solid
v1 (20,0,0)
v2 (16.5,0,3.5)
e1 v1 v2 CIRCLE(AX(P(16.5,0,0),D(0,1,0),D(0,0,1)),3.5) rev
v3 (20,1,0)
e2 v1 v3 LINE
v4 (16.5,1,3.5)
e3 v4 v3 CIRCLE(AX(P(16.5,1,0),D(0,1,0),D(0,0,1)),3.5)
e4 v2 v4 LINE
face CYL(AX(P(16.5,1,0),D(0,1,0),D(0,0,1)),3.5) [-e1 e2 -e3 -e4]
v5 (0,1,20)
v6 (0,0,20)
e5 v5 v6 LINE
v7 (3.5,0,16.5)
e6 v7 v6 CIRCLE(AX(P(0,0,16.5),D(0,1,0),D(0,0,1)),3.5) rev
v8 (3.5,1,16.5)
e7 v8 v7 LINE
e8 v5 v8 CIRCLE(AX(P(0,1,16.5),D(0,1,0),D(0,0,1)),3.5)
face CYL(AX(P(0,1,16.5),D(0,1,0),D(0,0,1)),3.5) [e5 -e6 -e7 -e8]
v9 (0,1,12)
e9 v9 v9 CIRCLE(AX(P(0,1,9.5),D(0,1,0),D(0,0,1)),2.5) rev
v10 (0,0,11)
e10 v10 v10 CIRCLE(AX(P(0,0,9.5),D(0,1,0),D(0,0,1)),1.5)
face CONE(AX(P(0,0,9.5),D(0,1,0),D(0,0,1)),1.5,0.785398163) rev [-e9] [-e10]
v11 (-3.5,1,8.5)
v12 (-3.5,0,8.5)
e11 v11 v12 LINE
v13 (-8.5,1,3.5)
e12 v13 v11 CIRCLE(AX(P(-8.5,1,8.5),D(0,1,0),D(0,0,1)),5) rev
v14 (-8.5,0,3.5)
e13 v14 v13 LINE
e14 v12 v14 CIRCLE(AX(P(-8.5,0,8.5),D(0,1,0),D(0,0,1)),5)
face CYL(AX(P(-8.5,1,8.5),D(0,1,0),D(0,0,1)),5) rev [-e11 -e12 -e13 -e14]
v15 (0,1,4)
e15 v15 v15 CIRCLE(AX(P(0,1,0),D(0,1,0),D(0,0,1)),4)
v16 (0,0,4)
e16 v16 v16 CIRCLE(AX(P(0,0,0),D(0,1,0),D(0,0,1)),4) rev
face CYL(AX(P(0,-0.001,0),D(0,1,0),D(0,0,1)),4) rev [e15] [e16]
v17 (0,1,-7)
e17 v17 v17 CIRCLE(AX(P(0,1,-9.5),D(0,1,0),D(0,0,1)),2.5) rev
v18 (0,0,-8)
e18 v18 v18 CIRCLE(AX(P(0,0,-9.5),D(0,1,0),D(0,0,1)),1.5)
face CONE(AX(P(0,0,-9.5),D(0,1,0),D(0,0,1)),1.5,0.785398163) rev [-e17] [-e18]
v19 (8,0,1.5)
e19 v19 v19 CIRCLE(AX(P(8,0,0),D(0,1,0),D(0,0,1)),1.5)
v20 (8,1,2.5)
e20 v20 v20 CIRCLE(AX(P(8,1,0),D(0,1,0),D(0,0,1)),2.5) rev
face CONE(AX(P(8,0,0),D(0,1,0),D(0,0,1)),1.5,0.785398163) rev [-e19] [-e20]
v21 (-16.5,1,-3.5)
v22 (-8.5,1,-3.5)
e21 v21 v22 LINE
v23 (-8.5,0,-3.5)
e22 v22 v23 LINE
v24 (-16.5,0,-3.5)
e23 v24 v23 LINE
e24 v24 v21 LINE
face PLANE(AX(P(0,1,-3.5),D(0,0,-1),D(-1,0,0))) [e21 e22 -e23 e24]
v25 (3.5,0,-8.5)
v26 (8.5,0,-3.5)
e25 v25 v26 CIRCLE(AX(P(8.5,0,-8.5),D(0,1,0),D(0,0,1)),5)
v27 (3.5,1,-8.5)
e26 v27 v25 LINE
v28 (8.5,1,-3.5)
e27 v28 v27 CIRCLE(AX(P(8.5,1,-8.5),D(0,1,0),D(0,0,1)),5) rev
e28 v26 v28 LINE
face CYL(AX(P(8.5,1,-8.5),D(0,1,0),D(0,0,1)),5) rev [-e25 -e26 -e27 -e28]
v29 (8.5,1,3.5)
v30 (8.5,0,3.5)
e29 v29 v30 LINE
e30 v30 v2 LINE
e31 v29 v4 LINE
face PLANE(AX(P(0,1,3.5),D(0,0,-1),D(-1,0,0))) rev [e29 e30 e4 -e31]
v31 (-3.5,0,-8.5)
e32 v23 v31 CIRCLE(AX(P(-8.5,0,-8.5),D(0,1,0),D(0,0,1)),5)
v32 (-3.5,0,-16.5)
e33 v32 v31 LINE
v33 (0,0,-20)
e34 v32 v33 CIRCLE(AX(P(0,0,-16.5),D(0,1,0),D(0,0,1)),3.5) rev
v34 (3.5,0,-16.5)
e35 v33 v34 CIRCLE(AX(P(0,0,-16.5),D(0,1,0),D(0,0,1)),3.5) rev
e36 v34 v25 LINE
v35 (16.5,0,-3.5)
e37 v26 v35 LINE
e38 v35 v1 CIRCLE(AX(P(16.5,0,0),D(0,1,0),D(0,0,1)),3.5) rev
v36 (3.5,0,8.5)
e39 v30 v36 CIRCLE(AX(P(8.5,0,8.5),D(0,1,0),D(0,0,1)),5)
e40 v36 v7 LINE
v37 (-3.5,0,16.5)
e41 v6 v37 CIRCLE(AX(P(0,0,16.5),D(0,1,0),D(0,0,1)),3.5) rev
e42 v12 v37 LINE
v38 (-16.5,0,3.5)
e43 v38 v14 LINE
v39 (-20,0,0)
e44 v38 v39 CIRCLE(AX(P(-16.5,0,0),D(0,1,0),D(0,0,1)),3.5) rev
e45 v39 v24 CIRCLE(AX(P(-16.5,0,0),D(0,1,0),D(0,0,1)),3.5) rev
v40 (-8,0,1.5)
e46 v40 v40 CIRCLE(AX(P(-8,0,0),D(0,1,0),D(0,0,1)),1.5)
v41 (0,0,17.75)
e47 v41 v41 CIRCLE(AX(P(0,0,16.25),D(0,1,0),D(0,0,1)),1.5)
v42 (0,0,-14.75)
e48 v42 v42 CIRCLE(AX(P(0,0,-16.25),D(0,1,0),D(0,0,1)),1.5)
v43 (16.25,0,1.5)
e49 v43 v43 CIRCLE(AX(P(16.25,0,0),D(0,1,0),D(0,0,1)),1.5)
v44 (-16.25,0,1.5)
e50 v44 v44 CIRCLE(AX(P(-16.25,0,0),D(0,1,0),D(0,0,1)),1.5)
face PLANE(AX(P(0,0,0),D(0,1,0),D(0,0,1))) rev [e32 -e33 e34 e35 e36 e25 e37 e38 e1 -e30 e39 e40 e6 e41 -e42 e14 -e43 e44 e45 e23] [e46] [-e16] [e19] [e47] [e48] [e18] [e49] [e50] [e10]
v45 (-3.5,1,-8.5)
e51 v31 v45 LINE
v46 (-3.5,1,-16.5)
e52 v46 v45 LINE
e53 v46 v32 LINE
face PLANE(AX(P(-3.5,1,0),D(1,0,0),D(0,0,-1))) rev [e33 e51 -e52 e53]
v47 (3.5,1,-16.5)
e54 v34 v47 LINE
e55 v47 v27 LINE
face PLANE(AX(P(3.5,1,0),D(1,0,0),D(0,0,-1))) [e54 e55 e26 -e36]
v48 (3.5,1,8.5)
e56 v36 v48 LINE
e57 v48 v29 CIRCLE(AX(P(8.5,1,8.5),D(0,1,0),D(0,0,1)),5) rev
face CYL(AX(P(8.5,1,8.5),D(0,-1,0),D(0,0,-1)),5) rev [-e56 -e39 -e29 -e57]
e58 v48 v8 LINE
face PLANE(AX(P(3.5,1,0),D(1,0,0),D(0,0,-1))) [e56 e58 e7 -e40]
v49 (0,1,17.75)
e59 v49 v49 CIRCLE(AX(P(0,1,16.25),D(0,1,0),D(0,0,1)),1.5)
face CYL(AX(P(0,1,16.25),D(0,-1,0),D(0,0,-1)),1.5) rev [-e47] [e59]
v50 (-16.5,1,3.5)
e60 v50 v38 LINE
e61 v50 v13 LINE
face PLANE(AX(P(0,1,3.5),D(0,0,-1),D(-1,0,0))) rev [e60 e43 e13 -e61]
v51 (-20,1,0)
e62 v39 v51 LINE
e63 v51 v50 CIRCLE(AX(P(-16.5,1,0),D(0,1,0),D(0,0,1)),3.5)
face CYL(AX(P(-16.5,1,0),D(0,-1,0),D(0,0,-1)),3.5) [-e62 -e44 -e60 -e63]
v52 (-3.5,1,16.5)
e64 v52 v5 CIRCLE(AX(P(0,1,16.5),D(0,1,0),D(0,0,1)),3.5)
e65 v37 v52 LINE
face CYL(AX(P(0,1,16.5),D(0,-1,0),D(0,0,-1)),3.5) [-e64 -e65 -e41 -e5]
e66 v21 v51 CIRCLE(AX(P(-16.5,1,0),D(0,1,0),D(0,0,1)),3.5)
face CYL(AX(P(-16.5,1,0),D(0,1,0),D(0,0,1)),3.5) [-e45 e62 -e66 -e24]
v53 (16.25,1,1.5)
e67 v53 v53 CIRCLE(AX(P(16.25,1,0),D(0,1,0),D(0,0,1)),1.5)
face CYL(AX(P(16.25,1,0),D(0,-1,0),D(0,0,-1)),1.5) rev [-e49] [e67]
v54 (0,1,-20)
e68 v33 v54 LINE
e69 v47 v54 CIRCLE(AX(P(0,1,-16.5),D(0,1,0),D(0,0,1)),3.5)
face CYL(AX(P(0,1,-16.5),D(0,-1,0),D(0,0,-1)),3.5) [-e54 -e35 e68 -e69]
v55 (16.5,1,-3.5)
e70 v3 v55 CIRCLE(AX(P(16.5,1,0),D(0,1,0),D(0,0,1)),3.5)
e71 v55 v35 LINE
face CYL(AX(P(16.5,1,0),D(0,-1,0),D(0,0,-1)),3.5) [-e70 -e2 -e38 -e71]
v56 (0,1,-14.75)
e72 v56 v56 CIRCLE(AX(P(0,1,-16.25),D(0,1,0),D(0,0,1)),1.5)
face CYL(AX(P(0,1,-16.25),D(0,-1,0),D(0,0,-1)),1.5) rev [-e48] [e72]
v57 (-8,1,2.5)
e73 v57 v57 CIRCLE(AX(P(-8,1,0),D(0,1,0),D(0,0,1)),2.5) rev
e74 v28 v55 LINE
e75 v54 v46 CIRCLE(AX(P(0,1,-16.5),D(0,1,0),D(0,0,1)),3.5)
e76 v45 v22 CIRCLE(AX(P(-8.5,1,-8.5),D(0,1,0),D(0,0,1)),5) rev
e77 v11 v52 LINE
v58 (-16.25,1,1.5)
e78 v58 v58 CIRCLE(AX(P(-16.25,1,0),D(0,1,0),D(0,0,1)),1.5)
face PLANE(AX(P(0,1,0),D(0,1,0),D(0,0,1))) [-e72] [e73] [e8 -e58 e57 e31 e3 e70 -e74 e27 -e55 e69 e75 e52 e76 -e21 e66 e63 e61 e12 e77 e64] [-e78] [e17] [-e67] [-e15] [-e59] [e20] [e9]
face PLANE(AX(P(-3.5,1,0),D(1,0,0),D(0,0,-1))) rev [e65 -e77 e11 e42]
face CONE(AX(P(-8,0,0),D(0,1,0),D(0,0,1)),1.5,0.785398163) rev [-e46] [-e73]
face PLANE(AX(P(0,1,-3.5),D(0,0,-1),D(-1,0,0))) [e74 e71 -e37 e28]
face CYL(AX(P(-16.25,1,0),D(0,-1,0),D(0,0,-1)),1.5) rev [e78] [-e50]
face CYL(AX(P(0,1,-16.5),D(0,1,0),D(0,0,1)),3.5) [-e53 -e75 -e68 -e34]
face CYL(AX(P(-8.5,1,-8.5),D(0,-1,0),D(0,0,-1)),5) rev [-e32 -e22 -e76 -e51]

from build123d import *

# Parameters (mm, degrees)
SKETCH1_W           = 3.5
SKETCH1_H           = 3.5
BOSS_EXTRUDE1_DEPTH = 1
FILLET1_R           = 5
FILLET2_R           = 3.5
CUT_EXTRUDE1_REACH  = 30.302
SKETCH2_R           = 4
CHAMFER1_SIZE       = 1


with BuildPart() as part:
    # Sketch1 → Boss-Extrude1 (new body)
    with BuildSketch(Plane(origin=(0, 0, 0), x_dir=(1, 0, 0), z_dir=(0, 1, 0))):
        with BuildLine():
            Line((-6.5, 0), (-3.5, 0))
            Line((-3.5, 0), (-3.5, 3.5))
            Line((-3.5, 3.5), (-20, 3.5))
            Line((-20, 3.5), (-20, 0))
            Line((-20, 0), (-17.75, 0))
            ThreePointArc((-17.75, 0), (-16.25, 1.5), (-14.75, 0))
            Line((-14.75, 0), (-9.5, 0))
            ThreePointArc((-9.5, 0), (-8, 1.5), (-6.5, 0))
        make_face()
        with BuildLine():
            Line((-20, -3.5), (-3.5, -3.5))
            Line((-3.5, -3.5), (-3.5, 0))
            Line((-3.5, 0), (-6.5, 0))
            ThreePointArc((-6.5, 0), (-8, -1.5), (-9.5, 0))
            Line((-9.5, 0), (-14.75, 0))
            ThreePointArc((-14.75, 0), (-16.25, -1.5), (-17.75, 0))
            Line((-17.75, 0), (-20, 0))
            Line((-20, 0), (-20, -3.5))
        make_face()
        with BuildLine():
            Line((-3.5, 20), (-3.5, 3.5))
            Line((-3.5, 3.5), (0, 3.5))
            Line((0, 3.5), (0, 8))
            ThreePointArc((0, 8), (-1.5, 9.5), (0, 11))
            Line((0, 11), (0, 14.75))
            ThreePointArc((0, 14.75), (-1.5, 16.25), (0, 17.75))
            Line((0, 17.75), (0, 20))
            Line((0, 20), (-3.5, 20))
        make_face()
        with BuildLine():
            Line((0, 3.5), (3.5, 3.5))
            Line((3.5, 3.5), (3.5, 20))
            Line((3.5, 20), (0, 20))
            Line((0, 20), (0, 17.75))
            ThreePointArc((0, 17.75), (1.060660172, 17.310660172), (1.5, 16.25))
            ThreePointArc((1.5, 16.25), (1.060660172, 15.189339828), (0, 14.75))
            Line((0, 14.75), (0, 11))
            ThreePointArc((0, 11), (1.060660172, 10.560660172), (1.5, 9.5))
            ThreePointArc((1.5, 9.5), (1.060660172, 8.439339828), (0, 8))
            Line((0, 8), (0, 3.5))
        make_face()
        with BuildLine():
            Line((3.5, 3.5), (3.5, 0))
            Line((3.5, 0), (6.5, 0))
            ThreePointArc((6.5, 0), (8, 1.5), (9.5, 0))
            Line((9.5, 0), (14.75, 0))
            ThreePointArc((14.75, 0), (16.25, 1.5), (17.75, 0))
            Line((17.75, 0), (20, 0))
            Line((20, 0), (20, 3.5))
            Line((20, 3.5), (3.5, 3.5))
        make_face()
        with Locations((-1.75, 1.75)):
            Rectangle(SKETCH1_W, SKETCH1_H)
        with Locations((-1.75, -1.75)):
            Rectangle(SKETCH1_W, SKETCH1_H)
        with Locations((1.75, -1.75)):
            Rectangle(SKETCH1_W, SKETCH1_H)
        with Locations((1.75, 1.75)):
            Rectangle(SKETCH1_W, SKETCH1_H)
        with BuildLine():
            Line((-3.5, -20), (0, -20))
            Line((0, -20), (0, -17.75))
            ThreePointArc((0, -17.75), (-1.5, -16.25), (0, -14.75))
            Line((0, -14.75), (0, -11))
            ThreePointArc((0, -11), (-1.5, -9.5), (0, -8))
            Line((0, -8), (0, -3.5))
            Line((0, -3.5), (-3.5, -3.5))
            Line((-3.5, -3.5), (-3.5, -20))
        make_face()
        with BuildLine():
            Line((0, -17.75), (0, -20))
            Line((0, -20), (3.5, -20))
            Line((3.5, -20), (3.5, -3.5))
            Line((3.5, -3.5), (0, -3.5))
            Line((0, -3.5), (0, -8))
            ThreePointArc((0, -8), (1.060660172, -8.439339828), (1.5, -9.5))
            ThreePointArc((1.5, -9.5), (1.060660172, -10.560660172), (0, -11))
            Line((0, -11), (0, -14.75))
            ThreePointArc((0, -14.75), (1.060660172, -15.189339828), (1.5, -16.25))
            ThreePointArc((1.5, -16.25), (1.060660172, -17.310660172), (0, -17.75))
        make_face()
        with BuildLine():
            Line((3.5, 0), (3.5, -3.5))
            Line((3.5, -3.5), (20, -3.5))
            Line((20, -3.5), (20, 0))
            Line((20, 0), (17.75, 0))
            ThreePointArc((17.75, 0), (16.25, -1.5), (14.75, 0))
            Line((14.75, 0), (9.5, 0))
            ThreePointArc((9.5, 0), (8, -1.5), (6.5, 0))
            Line((6.5, 0), (3.5, 0))
        make_face()
    extrude(amount=BOSS_EXTRUDE1_DEPTH)

    # Fillet1
    fillet1_edges = [part.edges().sort_by_distance(p)[0] for p in [
        (-3.5, 0.5, -3.5),
        (3.5, 0.5, -3.5),
        (3.5, 0.5, 3.5),
        (-3.5, 0.5, 3.5),
    ]]
    fillet(fillet1_edges, radius=FILLET1_R)

    # Fillet2
    fillet2_edges = [part.edges().sort_by_distance(p)[0] for p in [
        (20, 0.5, 3.5),
        (20, 0.5, -3.5),
        (3.5, 0.5, -20),
        (-3.5, 0.5, -20),
        (-20, 0.5, -3.5),
        (-20, 0.5, 3.5),
        (3.5, 0.5, 20),
        (-3.5, 0.5, 20),
    ]]
    fillet(fillet2_edges, radius=FILLET2_R - 0.0001)  # a hair under: the kernel refuses the full size

    # Sketch2 → Cut-Extrude1 (cut, up to next)
    with BuildSketch(Plane(origin=(0, 1, 0), x_dir=(1, 0, 0), z_dir=(0, 1, 0)), mode=Mode.PRIVATE) as cut_extrude1_sk1:
        with Locations(Location((0, 0, 0), (0, 0, 270))):
            Circle(SKETCH2_R)
    cut_extrude1_tool1 = extrude(cut_extrude1_sk1.sketch, amount=-CUT_EXTRUDE1_REACH, mode=Mode.PRIVATE) & part.part
    add(cut_extrude1_tool1.solids().sort_by_distance((0, 1, 0))[0], mode=Mode.SUBTRACT)

    # Chamfer1
    chamfer1_edges = [part.edges().sort_by_distance(p)[0] for p in [
        (0, 1, 11),
        (6.5, 1, 0),
        (-6.5, 1, 0),
        (0, 1, -11),
    ]]
    chamfer(chamfer1_edges, length=CHAMFER1_SIZE - 0.0001)  # a hair under: the kernel refuses the full size


solid = part.part
